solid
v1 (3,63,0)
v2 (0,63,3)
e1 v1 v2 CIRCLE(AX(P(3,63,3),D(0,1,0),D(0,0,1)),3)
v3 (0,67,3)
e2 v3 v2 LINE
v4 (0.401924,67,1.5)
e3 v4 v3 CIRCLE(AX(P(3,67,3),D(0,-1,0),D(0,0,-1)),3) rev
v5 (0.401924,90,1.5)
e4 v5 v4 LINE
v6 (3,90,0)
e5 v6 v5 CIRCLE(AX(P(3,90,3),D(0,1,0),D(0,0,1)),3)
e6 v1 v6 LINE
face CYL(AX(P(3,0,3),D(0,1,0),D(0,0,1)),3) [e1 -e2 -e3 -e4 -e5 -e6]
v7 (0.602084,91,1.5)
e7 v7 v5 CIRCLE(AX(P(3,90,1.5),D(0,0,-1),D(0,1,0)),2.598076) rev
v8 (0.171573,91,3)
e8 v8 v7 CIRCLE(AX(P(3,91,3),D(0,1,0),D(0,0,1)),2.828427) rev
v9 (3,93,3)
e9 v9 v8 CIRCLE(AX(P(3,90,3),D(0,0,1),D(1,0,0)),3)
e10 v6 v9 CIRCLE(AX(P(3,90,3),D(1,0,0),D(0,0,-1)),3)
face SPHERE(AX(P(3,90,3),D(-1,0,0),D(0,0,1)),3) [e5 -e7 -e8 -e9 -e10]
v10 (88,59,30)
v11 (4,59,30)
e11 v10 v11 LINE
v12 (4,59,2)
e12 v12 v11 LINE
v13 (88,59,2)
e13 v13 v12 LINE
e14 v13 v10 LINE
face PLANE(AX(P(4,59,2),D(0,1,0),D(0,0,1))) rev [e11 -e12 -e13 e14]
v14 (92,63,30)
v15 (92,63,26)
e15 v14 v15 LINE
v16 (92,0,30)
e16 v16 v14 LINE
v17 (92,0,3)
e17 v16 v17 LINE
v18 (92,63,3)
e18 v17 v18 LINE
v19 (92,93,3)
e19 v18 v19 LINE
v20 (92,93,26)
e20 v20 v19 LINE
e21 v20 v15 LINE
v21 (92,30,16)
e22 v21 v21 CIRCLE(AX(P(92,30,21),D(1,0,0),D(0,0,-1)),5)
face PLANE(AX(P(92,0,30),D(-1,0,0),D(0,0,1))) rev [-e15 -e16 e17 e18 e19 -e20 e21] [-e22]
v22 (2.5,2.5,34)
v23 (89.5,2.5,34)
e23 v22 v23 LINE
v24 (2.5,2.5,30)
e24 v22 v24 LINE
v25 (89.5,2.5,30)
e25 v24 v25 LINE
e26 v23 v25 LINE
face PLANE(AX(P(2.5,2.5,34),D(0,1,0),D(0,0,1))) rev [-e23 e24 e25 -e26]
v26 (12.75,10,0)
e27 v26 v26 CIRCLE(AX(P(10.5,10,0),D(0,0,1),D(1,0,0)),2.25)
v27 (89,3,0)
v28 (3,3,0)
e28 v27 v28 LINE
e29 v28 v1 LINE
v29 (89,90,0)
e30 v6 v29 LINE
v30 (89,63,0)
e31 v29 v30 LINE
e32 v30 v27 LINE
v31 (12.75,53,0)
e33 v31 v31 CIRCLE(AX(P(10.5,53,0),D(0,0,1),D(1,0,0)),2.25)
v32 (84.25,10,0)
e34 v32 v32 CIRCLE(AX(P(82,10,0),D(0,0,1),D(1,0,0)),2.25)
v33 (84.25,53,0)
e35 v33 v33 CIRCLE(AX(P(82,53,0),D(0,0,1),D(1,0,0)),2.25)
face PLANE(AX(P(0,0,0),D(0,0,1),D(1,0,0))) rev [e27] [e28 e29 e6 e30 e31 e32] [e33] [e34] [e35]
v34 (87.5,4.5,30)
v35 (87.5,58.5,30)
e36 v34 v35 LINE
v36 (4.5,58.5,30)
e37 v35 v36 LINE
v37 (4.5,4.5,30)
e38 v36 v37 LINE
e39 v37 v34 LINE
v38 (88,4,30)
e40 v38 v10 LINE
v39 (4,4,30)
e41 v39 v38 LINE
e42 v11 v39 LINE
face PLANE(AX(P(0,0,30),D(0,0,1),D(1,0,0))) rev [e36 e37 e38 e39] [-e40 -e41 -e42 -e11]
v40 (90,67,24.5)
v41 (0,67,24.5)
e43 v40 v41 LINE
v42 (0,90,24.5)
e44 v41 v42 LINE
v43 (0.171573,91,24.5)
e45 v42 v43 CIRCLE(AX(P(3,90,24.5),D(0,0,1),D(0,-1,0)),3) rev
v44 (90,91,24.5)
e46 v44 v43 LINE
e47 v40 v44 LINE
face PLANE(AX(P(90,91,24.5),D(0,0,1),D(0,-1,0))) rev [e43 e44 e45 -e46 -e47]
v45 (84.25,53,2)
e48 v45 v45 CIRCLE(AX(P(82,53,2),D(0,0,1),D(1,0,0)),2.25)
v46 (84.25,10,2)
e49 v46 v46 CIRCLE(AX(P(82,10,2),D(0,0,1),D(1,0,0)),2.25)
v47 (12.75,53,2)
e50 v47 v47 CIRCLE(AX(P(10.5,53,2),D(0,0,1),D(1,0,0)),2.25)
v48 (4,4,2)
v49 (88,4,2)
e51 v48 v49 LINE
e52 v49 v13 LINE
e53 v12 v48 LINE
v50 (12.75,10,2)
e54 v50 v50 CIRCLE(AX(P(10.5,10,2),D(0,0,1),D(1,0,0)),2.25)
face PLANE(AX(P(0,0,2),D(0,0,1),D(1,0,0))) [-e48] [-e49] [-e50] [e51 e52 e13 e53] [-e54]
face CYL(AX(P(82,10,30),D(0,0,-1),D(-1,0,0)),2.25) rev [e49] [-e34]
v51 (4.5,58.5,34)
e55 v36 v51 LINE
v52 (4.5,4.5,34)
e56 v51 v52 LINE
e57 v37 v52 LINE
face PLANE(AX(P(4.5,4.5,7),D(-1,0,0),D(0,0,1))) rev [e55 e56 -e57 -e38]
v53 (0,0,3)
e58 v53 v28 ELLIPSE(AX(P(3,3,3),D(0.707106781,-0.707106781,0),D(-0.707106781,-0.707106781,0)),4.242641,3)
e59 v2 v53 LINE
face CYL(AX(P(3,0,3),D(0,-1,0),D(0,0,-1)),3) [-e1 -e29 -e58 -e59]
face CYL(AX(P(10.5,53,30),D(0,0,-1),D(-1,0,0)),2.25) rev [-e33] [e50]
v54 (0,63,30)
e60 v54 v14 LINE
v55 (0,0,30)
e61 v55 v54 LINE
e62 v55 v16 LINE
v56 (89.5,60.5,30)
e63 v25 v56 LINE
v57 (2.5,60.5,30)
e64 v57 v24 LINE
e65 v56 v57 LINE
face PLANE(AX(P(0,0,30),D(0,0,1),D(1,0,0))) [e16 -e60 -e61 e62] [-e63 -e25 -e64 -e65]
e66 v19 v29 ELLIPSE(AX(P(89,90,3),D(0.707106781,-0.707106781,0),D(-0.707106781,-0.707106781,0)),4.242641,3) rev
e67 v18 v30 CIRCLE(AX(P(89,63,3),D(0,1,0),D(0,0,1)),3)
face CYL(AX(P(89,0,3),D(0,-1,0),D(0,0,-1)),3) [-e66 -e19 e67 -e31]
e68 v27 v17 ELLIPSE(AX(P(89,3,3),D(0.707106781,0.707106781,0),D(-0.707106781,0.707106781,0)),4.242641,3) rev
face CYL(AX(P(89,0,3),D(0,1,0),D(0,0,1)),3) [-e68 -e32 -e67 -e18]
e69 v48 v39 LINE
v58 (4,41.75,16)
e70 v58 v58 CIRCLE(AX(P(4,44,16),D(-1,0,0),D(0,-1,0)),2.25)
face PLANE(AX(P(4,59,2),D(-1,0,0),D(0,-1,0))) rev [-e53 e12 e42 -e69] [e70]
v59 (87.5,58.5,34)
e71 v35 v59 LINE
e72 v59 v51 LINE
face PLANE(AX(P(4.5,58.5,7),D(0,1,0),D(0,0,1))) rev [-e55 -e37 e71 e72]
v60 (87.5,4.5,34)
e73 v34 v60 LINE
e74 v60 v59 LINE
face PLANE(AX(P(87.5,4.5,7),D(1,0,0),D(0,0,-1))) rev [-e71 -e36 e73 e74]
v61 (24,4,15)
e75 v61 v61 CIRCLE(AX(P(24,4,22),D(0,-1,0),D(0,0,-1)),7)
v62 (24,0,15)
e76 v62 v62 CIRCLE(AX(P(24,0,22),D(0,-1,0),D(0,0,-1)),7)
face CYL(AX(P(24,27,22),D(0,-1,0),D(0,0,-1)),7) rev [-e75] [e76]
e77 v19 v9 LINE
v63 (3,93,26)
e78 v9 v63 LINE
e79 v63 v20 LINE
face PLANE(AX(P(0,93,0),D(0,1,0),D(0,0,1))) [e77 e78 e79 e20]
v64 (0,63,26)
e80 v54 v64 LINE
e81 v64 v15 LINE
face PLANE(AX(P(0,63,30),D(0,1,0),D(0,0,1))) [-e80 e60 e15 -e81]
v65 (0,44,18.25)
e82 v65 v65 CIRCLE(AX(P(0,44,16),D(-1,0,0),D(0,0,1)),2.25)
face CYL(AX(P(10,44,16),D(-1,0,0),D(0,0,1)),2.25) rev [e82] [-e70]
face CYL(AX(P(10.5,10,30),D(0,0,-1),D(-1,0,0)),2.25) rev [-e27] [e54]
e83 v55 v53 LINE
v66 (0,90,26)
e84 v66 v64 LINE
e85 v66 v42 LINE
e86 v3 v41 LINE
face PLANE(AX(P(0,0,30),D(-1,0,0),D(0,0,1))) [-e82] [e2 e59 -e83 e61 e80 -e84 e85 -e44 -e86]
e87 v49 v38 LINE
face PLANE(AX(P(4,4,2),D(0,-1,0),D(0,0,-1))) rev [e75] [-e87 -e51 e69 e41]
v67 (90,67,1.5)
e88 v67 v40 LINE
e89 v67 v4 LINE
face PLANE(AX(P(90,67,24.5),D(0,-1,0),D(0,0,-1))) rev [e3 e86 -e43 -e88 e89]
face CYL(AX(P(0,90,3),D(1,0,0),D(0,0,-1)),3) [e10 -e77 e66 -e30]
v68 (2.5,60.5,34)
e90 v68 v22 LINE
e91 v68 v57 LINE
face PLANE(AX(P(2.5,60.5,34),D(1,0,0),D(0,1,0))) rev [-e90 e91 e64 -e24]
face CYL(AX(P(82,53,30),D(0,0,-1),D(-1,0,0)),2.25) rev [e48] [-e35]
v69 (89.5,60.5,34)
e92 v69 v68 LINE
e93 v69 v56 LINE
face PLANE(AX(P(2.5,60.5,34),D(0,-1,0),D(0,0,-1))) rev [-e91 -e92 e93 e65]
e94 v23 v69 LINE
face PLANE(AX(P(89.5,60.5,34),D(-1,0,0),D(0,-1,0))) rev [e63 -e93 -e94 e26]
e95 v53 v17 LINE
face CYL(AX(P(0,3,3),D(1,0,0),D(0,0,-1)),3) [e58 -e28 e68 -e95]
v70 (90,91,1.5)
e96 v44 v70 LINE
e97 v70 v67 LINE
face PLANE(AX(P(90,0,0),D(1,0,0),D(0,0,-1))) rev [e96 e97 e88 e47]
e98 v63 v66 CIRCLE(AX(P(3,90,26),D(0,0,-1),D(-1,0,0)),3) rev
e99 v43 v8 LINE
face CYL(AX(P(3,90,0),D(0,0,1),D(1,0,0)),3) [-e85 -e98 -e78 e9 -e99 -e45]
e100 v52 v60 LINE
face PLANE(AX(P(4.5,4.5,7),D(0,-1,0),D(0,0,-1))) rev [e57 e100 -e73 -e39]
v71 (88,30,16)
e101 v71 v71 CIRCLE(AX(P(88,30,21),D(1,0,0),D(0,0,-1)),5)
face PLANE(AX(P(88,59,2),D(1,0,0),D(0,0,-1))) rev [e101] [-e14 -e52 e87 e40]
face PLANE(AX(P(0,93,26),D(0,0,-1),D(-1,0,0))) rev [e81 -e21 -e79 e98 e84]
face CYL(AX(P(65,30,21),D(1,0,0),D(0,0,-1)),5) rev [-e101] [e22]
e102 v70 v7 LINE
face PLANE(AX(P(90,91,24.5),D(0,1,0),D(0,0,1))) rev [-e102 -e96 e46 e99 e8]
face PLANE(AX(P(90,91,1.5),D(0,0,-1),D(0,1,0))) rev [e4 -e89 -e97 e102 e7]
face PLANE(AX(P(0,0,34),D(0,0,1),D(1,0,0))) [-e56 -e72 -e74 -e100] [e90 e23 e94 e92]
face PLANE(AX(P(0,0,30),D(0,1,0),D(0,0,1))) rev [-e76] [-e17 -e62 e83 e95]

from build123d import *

# Parameters (mm, degrees)
SKETCH3_W           = 92
SKETCH3_H           = 63
SKETCH3_R           = 2.25
BOSS_EXTRUDE3_DEPTH = 30
SKETCH4_W           = 84
SKETCH4_H           = 55
CUT_EXTRUDE1_DEPTH  = 28
FILLET1_R           = 3
SKETCH5_W           = 87
SKETCH5_H           = 58
BOSS_EXTRUDE4_DEPTH = 4
SKETCH7_W           = 83
SKETCH7_H           = 54
CUT_EXTRUDE4_DEPTH  = 27
SKETCH9_R           = 7
CUT_EXTRUDE6_DEPTH  = 27
SKETCH11_R          = 5
CUT_EXTRUDE7_DEPTH  = 27
SKETCH12_R          = 2.25
CUT_EXTRUDE8_DEPTH  = 10
SKETCH13_W          = 92
SKETCH13_H          = 26
BOSS_EXTRUDE6_DEPTH = 30
SKETCH14_W          = 23
SKETCH14_H          = 24
CUT_EXTRUDE9_DEPTH  = 90
FILLET3_R           = 3
FILLET4_R           = 3


with BuildPart() as part:
    # Sketch3 → Boss-Extrude3 (new body)
    with BuildSketch(Plane.XY):
        with Locations((46, 31.5)):
            Rectangle(SKETCH3_W, SKETCH3_H)
        with Locations((82, 53)):
            Circle(SKETCH3_R, mode=Mode.SUBTRACT)
        with Locations((82, 10)):
            Circle(SKETCH3_R, mode=Mode.SUBTRACT)
        with Locations((10.5, 10)):
            Circle(SKETCH3_R, mode=Mode.SUBTRACT)
        with Locations((10.5, 53)):
            Circle(SKETCH3_R, mode=Mode.SUBTRACT)
    extrude(amount=BOSS_EXTRUDE3_DEPTH)

    # Sketch4 → Cut-Extrude1 (cut)
    with BuildSketch(Plane.XY.offset(30)):
        with Locations((46, 31.5)):
            Rectangle(SKETCH4_W, SKETCH4_H)
    extrude(amount=-CUT_EXTRUDE1_DEPTH, mode=Mode.SUBTRACT)

    # Fillet1
    fillet1_edges = [part.edges().sort_by_distance(p)[0] for p in [
        (92, 31.5, 0),
        (46, 0, 0),
        (0, 31.5, 0),
    ]]
    fillet(fillet1_edges, radius=FILLET1_R)

    # Sketch5 → Boss-Extrude4 (add)
    with BuildSketch(Plane.XY.offset(30)):
        with Locations((46, 31.5)):
            Rectangle(SKETCH5_W, SKETCH5_H)
    extrude(amount=BOSS_EXTRUDE4_DEPTH)

    # Sketch7 → Cut-Extrude4 (cut)
    with BuildSketch(Plane.XY.offset(34)):
        with Locations((46, 31.5)):
            Rectangle(SKETCH7_W, SKETCH7_H)
    extrude(amount=-CUT_EXTRUDE4_DEPTH, mode=Mode.SUBTRACT)

    # Sketch9 → Cut-Extrude6 (cut)
    with BuildSketch(Plane.XZ):
        with Locations(Location((24, 22, 0), (0, 0, 270))):
            Circle(SKETCH9_R)
    extrude(amount=-CUT_EXTRUDE6_DEPTH, mode=Mode.SUBTRACT)

    # Sketch11 → Cut-Extrude7 (cut)
    with BuildSketch(Plane(origin=(92, 0, 0), x_dir=(0, 0, -1), z_dir=(1, 0, 0))):
        with Locations((-21, 30)):
            Circle(SKETCH11_R)
    extrude(amount=-CUT_EXTRUDE7_DEPTH, mode=Mode.SUBTRACT)

    # Sketch12 → Cut-Extrude8 (cut)
    with BuildSketch(Plane.ZY):
        with Locations((16, 44)):
            Circle(SKETCH12_R)
    extrude(amount=-CUT_EXTRUDE8_DEPTH, mode=Mode.SUBTRACT)

    # Sketch13 → Boss-Extrude6 (add)
    with BuildSketch(Plane(origin=(0, 63, 0), x_dir=(1, 0, 0), z_dir=(0, 1, 0))):
        with Locations((46, -13)):
            Rectangle(SKETCH13_W, SKETCH13_H)
    extrude(amount=BOSS_EXTRUDE6_DEPTH)

    # Sketch14 → Cut-Extrude9 (cut)
    with BuildSketch(Plane.ZY):
        with Locations((13, 79)):
            Rectangle(SKETCH14_W, SKETCH14_H)
    extrude(amount=-CUT_EXTRUDE9_DEPTH, mode=Mode.SUBTRACT)

    # Fillet3
    fillet3_edges = [part.edges().sort_by_distance(p)[0] for p in [
        (46, 93, 0),
        (92, 78, 0),
    ]]
    fillet(fillet3_edges, radius=FILLET3_R)

    # Fillet4
    # the kernel refuses this fillet: 3 mm, written as the material it takes off along each edge
    with BuildSketch(Plane(origin=(0, 93, 33.5), x_dir=(0, -1, 0), z_dir=(0, 0, -1))) as fillet4_piece_1:
        with BuildLine():
            CenterArc((FILLET4_R, -FILLET4_R), FILLET4_R, 90, 90)
            Line((0, -FILLET4_R), (0, 0))
            Line((0, 0), (FILLET4_R, 0))
        make_face()
    extrude(amount=30.5, mode=Mode.SUBTRACT)
    with BuildSketch(Plane(origin=(0, 55.5, 0), x_dir=(0, 0, 1), z_dir=(0, 1, 0))) as fillet4_piece_2:
        with BuildLine():
            CenterArc((FILLET4_R, FILLET4_R), FILLET4_R, 180, 90)
            Line((0, FILLET4_R), (0, 0))
            Line((0, 0), (FILLET4_R, 0))
        make_face()
    extrude(amount=34.5, mode=Mode.SUBTRACT)
    with BuildSketch(Plane(origin=(0, 90, 3), x_dir=(0, 1, 0), z_dir=(0, 0, 1))) as fillet4_piece_3:
        with BuildLine():
            CenterArc((3 - FILLET4_R, -FILLET4_R), FILLET4_R, 0, 90)
            Line((3, -FILLET4_R), (3, 0))
            Line((3, 0), (3 - FILLET4_R, 0))
        make_face()
    revolve(axis=Axis((0, 90, 3), (-1, 0, 0)), revolution_arc=90, mode=Mode.SUBTRACT)


solid = part.part
